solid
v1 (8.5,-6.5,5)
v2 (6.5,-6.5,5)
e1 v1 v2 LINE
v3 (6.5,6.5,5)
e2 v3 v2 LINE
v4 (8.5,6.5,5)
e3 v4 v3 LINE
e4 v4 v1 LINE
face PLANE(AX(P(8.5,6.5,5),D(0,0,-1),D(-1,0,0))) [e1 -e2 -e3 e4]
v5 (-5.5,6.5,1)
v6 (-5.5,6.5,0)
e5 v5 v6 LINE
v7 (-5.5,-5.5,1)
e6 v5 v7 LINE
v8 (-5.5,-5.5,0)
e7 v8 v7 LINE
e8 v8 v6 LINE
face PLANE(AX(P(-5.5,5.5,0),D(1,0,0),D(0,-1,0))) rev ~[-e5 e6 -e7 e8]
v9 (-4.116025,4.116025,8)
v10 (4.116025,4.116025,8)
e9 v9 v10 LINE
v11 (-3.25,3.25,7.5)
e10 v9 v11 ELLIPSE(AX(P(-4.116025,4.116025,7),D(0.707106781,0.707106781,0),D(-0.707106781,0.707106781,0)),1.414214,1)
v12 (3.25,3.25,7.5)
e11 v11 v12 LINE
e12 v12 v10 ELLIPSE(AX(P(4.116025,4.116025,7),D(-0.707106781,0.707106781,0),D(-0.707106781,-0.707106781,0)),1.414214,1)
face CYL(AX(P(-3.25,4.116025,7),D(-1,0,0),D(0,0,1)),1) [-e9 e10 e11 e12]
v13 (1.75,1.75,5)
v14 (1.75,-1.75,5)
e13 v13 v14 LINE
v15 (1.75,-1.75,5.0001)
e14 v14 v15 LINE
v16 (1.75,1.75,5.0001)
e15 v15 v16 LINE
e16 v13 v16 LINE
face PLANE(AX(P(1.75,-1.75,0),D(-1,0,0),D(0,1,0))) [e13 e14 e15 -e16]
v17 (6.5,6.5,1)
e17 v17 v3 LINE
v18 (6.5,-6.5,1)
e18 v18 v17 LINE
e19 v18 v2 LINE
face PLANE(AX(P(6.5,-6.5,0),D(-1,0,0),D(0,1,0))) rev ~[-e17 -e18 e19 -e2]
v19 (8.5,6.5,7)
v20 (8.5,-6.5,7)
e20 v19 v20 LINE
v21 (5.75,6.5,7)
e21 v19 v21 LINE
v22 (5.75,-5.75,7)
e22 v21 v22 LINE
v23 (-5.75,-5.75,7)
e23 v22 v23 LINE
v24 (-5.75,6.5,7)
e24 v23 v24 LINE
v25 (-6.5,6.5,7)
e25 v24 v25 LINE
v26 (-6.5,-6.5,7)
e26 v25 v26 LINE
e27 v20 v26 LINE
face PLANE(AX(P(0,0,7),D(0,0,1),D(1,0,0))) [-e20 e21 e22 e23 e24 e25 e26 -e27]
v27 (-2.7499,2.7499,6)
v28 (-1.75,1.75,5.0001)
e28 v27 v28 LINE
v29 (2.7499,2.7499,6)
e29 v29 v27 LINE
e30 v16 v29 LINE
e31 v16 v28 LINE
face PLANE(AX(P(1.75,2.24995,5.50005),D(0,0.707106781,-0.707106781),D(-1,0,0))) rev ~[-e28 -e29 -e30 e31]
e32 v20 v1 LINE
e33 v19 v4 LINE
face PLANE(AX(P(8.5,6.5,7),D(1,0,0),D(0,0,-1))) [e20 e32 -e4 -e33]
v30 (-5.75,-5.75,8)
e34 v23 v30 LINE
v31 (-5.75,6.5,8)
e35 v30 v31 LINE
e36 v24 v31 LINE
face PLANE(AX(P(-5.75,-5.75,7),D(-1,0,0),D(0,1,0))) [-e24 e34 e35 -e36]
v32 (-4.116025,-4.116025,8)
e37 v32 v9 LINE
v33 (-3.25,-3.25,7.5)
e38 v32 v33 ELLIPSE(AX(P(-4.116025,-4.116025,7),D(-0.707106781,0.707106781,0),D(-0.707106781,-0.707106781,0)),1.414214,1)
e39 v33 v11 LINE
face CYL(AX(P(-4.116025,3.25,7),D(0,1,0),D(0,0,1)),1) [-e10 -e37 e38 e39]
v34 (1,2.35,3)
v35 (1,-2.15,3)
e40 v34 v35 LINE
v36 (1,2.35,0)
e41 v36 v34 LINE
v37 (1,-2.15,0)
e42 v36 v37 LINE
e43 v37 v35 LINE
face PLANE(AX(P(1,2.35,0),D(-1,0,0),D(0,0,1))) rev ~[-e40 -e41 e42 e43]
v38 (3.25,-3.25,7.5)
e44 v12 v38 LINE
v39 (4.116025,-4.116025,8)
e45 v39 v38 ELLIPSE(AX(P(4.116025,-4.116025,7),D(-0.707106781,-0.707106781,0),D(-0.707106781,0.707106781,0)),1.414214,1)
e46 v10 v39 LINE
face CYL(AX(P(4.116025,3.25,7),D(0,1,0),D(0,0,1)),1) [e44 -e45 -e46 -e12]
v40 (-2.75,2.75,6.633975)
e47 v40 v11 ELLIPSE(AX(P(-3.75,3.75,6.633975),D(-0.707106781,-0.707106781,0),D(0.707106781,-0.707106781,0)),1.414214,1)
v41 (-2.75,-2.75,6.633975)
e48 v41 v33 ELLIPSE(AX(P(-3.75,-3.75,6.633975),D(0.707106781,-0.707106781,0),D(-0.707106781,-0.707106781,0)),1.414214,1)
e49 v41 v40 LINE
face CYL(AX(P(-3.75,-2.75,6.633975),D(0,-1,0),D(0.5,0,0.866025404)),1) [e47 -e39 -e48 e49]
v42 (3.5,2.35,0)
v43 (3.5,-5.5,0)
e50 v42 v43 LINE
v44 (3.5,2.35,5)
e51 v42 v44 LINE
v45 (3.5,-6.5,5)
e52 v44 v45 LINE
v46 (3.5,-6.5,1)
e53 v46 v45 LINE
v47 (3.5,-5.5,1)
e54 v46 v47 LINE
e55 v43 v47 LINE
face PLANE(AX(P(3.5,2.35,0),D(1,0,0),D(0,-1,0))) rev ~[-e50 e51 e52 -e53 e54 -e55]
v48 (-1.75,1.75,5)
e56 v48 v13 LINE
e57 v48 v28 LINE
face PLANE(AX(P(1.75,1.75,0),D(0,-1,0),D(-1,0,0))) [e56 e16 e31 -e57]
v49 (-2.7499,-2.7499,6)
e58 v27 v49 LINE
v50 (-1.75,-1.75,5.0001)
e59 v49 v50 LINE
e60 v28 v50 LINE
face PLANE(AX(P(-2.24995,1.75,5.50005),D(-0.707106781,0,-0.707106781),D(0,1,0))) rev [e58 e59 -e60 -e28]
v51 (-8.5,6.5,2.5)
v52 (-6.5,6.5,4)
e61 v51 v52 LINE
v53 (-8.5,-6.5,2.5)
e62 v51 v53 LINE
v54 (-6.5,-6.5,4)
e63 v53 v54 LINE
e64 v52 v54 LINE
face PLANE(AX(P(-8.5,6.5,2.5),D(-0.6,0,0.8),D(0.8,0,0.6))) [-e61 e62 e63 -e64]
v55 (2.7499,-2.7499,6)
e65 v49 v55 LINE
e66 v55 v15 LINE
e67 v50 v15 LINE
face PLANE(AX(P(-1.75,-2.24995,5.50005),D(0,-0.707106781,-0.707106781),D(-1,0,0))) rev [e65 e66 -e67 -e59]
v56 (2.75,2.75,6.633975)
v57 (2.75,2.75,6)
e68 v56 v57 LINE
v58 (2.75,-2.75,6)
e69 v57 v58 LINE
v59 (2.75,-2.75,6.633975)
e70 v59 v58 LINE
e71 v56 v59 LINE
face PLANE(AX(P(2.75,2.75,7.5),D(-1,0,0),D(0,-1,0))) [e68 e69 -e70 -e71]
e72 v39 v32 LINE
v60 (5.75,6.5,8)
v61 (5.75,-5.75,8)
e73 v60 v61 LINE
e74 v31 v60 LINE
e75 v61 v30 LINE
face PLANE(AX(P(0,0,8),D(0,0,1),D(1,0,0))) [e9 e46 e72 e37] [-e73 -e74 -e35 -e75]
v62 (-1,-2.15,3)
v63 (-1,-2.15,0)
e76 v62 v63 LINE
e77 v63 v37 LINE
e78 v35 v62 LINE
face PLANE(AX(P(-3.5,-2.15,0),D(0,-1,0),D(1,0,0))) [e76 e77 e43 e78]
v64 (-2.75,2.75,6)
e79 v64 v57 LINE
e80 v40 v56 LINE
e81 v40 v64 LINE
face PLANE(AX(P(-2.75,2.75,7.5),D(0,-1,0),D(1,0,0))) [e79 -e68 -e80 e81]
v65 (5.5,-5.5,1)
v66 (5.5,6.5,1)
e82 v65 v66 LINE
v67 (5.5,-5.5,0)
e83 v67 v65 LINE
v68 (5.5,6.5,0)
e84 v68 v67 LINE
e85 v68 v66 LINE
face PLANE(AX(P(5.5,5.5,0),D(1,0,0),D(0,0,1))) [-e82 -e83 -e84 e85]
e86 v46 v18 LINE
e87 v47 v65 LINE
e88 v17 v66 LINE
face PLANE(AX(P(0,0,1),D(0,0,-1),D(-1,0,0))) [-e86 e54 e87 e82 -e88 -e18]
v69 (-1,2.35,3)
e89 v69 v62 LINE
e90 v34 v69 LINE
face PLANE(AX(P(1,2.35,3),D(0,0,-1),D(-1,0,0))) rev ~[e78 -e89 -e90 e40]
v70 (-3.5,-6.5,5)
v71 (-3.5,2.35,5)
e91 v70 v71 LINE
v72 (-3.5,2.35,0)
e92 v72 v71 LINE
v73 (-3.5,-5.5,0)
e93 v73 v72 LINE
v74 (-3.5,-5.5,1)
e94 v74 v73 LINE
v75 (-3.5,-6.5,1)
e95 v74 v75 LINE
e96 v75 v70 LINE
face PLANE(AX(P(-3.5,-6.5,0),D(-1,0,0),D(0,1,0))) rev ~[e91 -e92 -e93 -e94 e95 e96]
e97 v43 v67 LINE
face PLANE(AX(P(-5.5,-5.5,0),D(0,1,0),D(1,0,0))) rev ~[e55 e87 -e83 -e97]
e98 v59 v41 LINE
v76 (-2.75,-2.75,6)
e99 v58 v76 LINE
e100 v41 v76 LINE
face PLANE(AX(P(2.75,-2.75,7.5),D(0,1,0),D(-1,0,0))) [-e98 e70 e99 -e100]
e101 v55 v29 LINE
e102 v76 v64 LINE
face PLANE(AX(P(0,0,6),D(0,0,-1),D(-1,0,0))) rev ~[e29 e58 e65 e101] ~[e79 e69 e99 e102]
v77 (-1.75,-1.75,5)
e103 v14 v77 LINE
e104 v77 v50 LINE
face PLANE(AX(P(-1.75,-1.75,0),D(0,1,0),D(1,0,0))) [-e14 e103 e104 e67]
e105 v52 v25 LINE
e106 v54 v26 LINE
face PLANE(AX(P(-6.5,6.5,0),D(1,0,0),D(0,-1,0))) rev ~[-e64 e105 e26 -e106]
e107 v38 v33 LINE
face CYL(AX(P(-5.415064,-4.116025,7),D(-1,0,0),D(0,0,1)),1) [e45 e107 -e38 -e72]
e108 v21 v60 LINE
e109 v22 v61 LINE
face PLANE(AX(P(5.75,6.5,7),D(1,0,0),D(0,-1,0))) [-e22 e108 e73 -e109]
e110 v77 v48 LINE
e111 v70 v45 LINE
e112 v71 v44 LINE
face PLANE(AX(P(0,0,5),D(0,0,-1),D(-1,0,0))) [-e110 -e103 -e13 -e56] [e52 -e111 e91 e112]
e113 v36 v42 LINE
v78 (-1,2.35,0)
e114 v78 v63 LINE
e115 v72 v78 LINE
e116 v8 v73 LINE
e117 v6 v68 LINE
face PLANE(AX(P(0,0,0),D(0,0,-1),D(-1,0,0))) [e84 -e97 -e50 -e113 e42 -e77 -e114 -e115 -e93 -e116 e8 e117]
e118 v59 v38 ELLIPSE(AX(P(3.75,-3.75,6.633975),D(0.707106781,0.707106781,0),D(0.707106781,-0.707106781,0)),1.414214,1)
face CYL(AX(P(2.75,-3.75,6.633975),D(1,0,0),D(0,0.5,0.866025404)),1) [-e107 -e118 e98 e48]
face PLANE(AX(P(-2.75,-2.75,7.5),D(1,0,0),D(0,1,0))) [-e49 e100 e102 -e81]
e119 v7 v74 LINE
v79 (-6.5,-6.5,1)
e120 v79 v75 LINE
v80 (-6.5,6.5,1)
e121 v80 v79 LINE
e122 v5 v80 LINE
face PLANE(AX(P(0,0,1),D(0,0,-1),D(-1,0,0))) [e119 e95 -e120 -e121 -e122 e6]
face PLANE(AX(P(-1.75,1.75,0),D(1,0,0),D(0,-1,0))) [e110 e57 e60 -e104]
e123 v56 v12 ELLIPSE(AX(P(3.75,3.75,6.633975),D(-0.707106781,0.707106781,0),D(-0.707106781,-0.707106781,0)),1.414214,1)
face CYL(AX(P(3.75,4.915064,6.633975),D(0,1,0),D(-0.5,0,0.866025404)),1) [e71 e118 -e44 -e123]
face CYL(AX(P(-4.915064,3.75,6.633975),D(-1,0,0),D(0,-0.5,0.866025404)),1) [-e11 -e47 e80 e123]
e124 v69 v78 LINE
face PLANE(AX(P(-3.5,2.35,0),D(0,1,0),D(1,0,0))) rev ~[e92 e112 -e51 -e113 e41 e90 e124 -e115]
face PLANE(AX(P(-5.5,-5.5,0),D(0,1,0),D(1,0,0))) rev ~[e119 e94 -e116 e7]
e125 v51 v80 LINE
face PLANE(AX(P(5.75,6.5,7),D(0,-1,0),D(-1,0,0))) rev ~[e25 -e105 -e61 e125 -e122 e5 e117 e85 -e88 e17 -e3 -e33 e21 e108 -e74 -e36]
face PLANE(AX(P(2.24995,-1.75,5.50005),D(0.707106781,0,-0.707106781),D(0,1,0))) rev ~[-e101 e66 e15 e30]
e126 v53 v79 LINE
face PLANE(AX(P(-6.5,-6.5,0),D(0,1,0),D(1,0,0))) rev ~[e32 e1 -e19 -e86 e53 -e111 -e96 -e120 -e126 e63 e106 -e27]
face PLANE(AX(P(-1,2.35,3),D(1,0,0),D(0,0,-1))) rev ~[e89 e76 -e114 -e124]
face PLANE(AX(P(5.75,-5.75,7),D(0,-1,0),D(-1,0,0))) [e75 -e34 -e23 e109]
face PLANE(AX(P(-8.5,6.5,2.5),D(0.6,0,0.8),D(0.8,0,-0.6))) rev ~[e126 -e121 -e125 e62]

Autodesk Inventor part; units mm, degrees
ref_plane "YZ Plane" through (0, 0, 0) normal (1, 0, 0) x (0, 1, 0)
ref_plane "XZ Plane" through (0, 0, 0) normal (0, 1, 0) x (-1, 0, 0)
ref_plane "XY Plane" through (0, 0, 0) normal (0, 0, 1) x (1, 0, 0)
sketch "Sketch1" plane through (0, 0, 0) normal (0, 0, 1) x (1, 0, 0)
  line L0 (-6.5, -6.5) -> (6.5, -6.5)
  line L1 (6.5, -6.5) -> (6.5, 6.5)
  line L2 (6.5, 6.5) -> (-6.5, 6.5)
  line L3 (-6.5, 6.5) -> (-6.5, -6.5)
  line L4 (-6.5, -6.5) -> (6.5, 6.5) construction
  line L5 (6.5, -6.5) -> (-6.5, 6.5) construction
  line L6 (-5.75, -5.75) -> (5.75, -5.75)
  line L7 (5.75, -5.75) -> (5.75, 5.75)
  line L8 (5.75, 5.75) -> (-5.75, 5.75)
  line L9 (-5.75, 5.75) -> (-5.75, -5.75)
  point P0 (0, 0)
  dimension "d0" = 13
  dimension "d1" = 13
  dimension "d2" = 0.75
extrude "Extrusion1" add sketch "Sketch1" along normal blind 7.5 contours L9 L8 L7 L6
extrude "Extrusion2" add sketch "Sketch1" along normal blind 7
sketch "Sketch2" plane through (0, 0, 7.5) normal (0, 0, 1) x (1, 0, 0)
  line L0 (5.75, 5.75) -> (-5.75, 5.75) projected
  line L1 (-5.75, -5.75) -> (5.75, -5.75)
  line L2 (5.75, -5.75) -> (5.75, 5.75)
  line L3 (5.75, 5.75) -> (-5.75, 5.75)
  line L4 (-5.75, 5.75) -> (-5.75, -5.75)
  line L5 (-5.75, -5.75) -> (5.75, 5.75) construction
  line L6 (5.75, -5.75) -> (-5.75, 5.75) construction
  line L7 (-3.75, -3.75) -> (3.75, -3.75)
  line L8 (3.75, -3.75) -> (3.75, 3.75)
  line L9 (3.75, 3.75) -> (-3.75, 3.75)
  line L10 (-3.75, 3.75) -> (-3.75, -3.75)
  line L11 (-4.75, 4.75) -> (4.75, 4.75)
  line L12 (4.75, 4.75) -> (4.75, -4.75)
  line L13 (4.75, -4.75) -> (-4.75, -4.75)
  line L14 (-4.75, -4.75) -> (-4.75, 4.75)
  line L15 (-2.75, 2.75) -> (2.75, 2.75)
  line L16 (2.75, 2.75) -> (2.75, -2.75)
  line L17 (2.75, -2.75) -> (-2.75, -2.75)
  line L18 (-2.75, -2.75) -> (-2.75, 2.75)
  point P0 (0, 0)
  dimension "d7" = 2
  dimension "d10" = 1
  dimension "d14" = 1
extrude "Extrusion3" cut sketch "Sketch2" against normal through all contours L15 L16 L17 L18
sketch "Sketch6" plane through (0, 0, 0) normal (0, 0, -1) x (-1, 0, 0)
  line L0 (2.75, -2.75) -> (2.75, 2.75) projected
  line L1 (-2.75, -2.75) -> (2.75, -2.75)
  line L2 (2.75, -2.75) -> (2.75, 2.75)
  line L3 (2.75, 2.75) -> (-2.75, 2.75)
  line L4 (-2.75, 2.75) -> (-2.75, -2.75)
  line L5 (-2.75, -2.75) -> (2.75, 2.75) construction
  line L6 (2.75, -2.75) -> (-2.75, 2.75) construction
  line L7 (-3.75, 3.75) -> (3.75, 3.75)
  line L8 (3.75, 3.75) -> (3.75, -3.75)
  line L9 (3.75, -3.75) -> (-3.75, -3.75)
  line L10 (-3.75, -3.75) -> (-3.75, 3.75)
  line L11 (6.5, -6.5) -> (-6.5, -6.5) projected
  line L12 (-3.75, -3.75) -> (3.75, -3.75)
  line L13 (3.75, -3.75) -> (3.75, -6.5)
  line L14 (3.75, -6.5) -> (-3.75, -6.5)
  line L15 (-3.75, -6.5) -> (-3.75, -3.75)
  line L16 (-1.75, 1.75) -> (1.75, 1.75)
  line L17 (1.75, 1.75) -> (1.75, -1.75)
  line L18 (1.75, -1.75) -> (-1.75, -1.75)
  line L19 (-1.75, -1.75) -> (-1.75, 1.75)
  point P0 (0, 0)
  dimension "d25" = 1
  dimension "d36" = 1
extrude "Extrusion9" add sketch "Sketch6" against normal blind 6 contours L1 L4 L3 L0
sketch "Sketch7" plane through (0, 0, 0) normal (0, 0, -1) x (-1, 0, 0)
  line L0 (6.5, -6.5) -> (-6.5, -6.5) projected
  line L1 (-3.5, -6.5) -> (3.5, -6.5)
  line L2 (3.5, -6.5) -> (3.5, 2.35)
  line L3 (3.5, 2.35) -> (-3.5, 2.35)
  line L4 (-3.5, 2.35) -> (-3.5, -6.5)
  line L5 (-6.5, -6.5) -> (-6.5, 6.5) projected
  line L6 (6.5, 6.5) -> (6.5, -6.5) projected
  line L7 (-1.75, 1.75) -> (1.75, 1.75) projected
  point P0 (0, 0)
  dimension "d47" = 3
  dimension "d48" = 3
  dimension "d49" = 0.6
extrude "Extrusion10" cut sketch "Sketch7" against normal blind 5
chamfer "Chamfer5" distance 1 angle 45 4 edges at (-1.75, 0, 6) (0, -1.75, 6) (1.75, 0, 6) (0, 1.75, 6)
sketch "Sketch8" plane through (0, 0, 5) normal (0, 0, -1) x (-1, 0, 0)
  point P0 (0, 0)
sketch "Sketch9" plane through (0, 0, 0) normal (0, 0, -1) x (-1, 0, 0)
  line L0 (-6.5, 6.5) -> (6.5, 6.5) projected
  line L1 (6.5, 6.5) -> (6.5, -6.5) projected
  line L2 (-6.5, 6.5) -> (6.5, 6.5)
  line L3 (6.5, 6.5) -> (6.5, -6.5)
  line L4 (6.5, -6.5) -> (-6.5, -6.5)
  line L5 (-6.5, -6.5) -> (-6.5, 6.5)
  line L6 (-5.5, 5.5) -> (5.5, 5.5)
  line L7 (5.5, 5.5) -> (5.5, -5.5)
  line L8 (5.5, -5.5) -> (-5.5, -5.5)
  line L9 (-5.5, -5.5) -> (-5.5, 5.5)
  point P0 (0, 0)
  dimension "d50" = 1
extrude "Extrusion11" cut sketch "Sketch9" against normal blind 1
sketch "Sketch10" plane through (-3.5, 2.35, 0) normal (0, -1, 0) x (1, 0, 0)
  line L0 (-2, 0) -> (9, 0) projected
  line L1 (4.5, 3) -> (2.5, 3)
  line L2 (2.5, 3) -> (2.5, 0)
  line L3 (2.5, 0) -> (4.5, 0)
  line L4 (4.5, 0) -> (4.5, 3)
  point P0 (3.5, 0)
  point P1 (3.5, 0)
  point P2 (4.5, 0)
  dimension "d53" = 3
  dimension "d54" = 2
  dimension "d55" = 1
extrude "Extrusion12" add sketch "Sketch10" along normal blind 4.5
sketch "Sketch11" plane through (-6.5, 6.5, 7) normal (0, 1, 0) x (1, 0, 0)
  line L0 (13, 6) -> (13, 0) projected
  line L1 (13, 0) -> (15, 0)
  line L2 (15, 0) -> (15, 2)
  line L3 (15, 2) -> (13, 2)
  line L4 (13, 2) -> (13, 0)
  line L5 (0, 6) -> (0, 0) projected
  line L6 (0, 6) -> (0, 3)
  line L7 (0, 4.5) -> (-2, 4.5)
  line L8 (-2, 4.5) -> (0, 3)
  line L9 (-2, 4.5) -> (0, 6)
  point P0 (6.5, 7)
  point P1 (13, 2)
  dimension "d58" = 2
  dimension "d59" = 2
  dimension "d60" = 2
extrude "Extrusion13" add sketch "Sketch11" against normal blind 13
sketch "Sketch12" plane through (-5.5, 5.5, 0) normal (0, 1, 0) x (1, 0, 0)
  line L0 (0, 0) -> (11, 0)
  line L1 (11, 0) -> (11, -7.4478)
  line L2 (11, -7.4478) -> (0, -7.4478)
  line L3 (0, -7.4478) -> (0, 0)
  line L4 (-0.25, -7.5) -> (11.25, -7.5) projected
  line L5 (0, 0) -> (11, 0)
  line L6 (11, 0) -> (11, -7.5)
  line L7 (11, -7.5) -> (0, -7.5)
  line L8 (0, -7.5) -> (0, 0)
  point P0 (5.5, 0)
extrude "Extrusion14" add sketch "Sketch12" along normal blind 1
sketch "Sketch13" plane through (0, 0, 7.5) normal (0, 0, 1) x (1, 0, 0)
  line L0 (5.75, 5.75) -> (5.5, 5.75) projected
  line L1 (-5.5, 6.5) -> (-5.5, -5.5) projected
  line L2 (5.5, 5.75) -> (-5.5, 5.75)
  line L3 (-5.5, 5.75) -> (-5.5, -5.5)
  line L4 (-5.5, -5.5) -> (5.5, -5.5)
  line L5 (5.5, -5.5) -> (5.5, 5.75)
  line L6 (5.75, -5.75) -> (-5.75, -5.75)
  line L7 (-5.75, -5.75) -> (-5.75, 6)
  line L8 (-5.75, 6) -> (5.75, 6)
  line L9 (5.75, 6) -> (5.75, -5.75)
  point P0 (0, 0)
  point P1 (-5.5, 6)
extrude "Extrusion15" cut sketch "Sketch13" against normal blind 0.5 contours L9 L6 L7 L8 L1 L4 L5 L0
sketch "Sketch14" plane through (0, 0, 7.5) normal (0, 0, 1) x (1, 0, 0)
  line L0 (5.5, 6.5) -> (-5.5, 6.5) projected
  line L1 (-5.5, 6.5) -> (5.5, 6.5)
  line L2 (5.5, 6.5) -> (5.5, -5.5)
  line L3 (5.5, -5.5) -> (-5.5, -5.5)
  line L4 (-5.5, -5.5) -> (-5.5, 6.5)
  line L5 (-3.25, 3.25) -> (-3.25, -3.25) projected
  line L6 (-3.25, -3.25) -> (3.25, -3.25) projected
  line L7 (-3.25, 3.25) -> (3.25, 3.25)
  line L8 (3.25, 3.25) -> (3.25, -3.25)
  line L9 (3.25, -3.25) -> (-3.25, -3.25)
  line L10 (-3.25, -3.25) -> (-3.25, 3.25)
  point P0 (0, 0)
extrude "Extrusion16" add sketch "Sketch14" along normal blind 0.5
sketch "Sketch15" plane through (0, 0, 7) normal (0, 0, 1) x (1, 0, 0)
  line L0 (5.5, 6.5) -> (5.5, -5.5) projected
  line L1 (5.5, 6.5) -> (-5.5, 6.5)
  line L2 (-5.5, 6.5) -> (-5.5, -5.5)
  line L3 (-5.5, -5.5) -> (5.5, -5.5)
  line L4 (5.5, -5.5) -> (5.5, 6.5)
  line L5 (5.75, -5.75) -> (-5.75, -5.75)
  line L6 (-5.75, -5.75) -> (-5.75, 6.75)
  line L7 (-5.75, 6.75) -> (5.75, 6.75)
  line L8 (5.75, 6.75) -> (5.75, -5.75)
  line L9 (5.75, 6.5) -> (-5.75, 6.5)
  point P0 (0, 0)
  dimension "d69" = 0.25
extrude "Extrusion17" add sketch "Sketch15" along normal blind 1 contours L9 L8 L5 L6 L2 L3 L0
fillet "Fillet1" radius 1 8 edges at (0, 2.75, 7.5) (2.75, 0, 7.5) (-2.75, 0, 7.5) (0, -2.75, 7.5) (0, 3.25, 8) (-3.25, 0, 8) (0, -3.25, 8) (3.25, 0, 8)
properties part number "NV_module" material "PET Plastic"
